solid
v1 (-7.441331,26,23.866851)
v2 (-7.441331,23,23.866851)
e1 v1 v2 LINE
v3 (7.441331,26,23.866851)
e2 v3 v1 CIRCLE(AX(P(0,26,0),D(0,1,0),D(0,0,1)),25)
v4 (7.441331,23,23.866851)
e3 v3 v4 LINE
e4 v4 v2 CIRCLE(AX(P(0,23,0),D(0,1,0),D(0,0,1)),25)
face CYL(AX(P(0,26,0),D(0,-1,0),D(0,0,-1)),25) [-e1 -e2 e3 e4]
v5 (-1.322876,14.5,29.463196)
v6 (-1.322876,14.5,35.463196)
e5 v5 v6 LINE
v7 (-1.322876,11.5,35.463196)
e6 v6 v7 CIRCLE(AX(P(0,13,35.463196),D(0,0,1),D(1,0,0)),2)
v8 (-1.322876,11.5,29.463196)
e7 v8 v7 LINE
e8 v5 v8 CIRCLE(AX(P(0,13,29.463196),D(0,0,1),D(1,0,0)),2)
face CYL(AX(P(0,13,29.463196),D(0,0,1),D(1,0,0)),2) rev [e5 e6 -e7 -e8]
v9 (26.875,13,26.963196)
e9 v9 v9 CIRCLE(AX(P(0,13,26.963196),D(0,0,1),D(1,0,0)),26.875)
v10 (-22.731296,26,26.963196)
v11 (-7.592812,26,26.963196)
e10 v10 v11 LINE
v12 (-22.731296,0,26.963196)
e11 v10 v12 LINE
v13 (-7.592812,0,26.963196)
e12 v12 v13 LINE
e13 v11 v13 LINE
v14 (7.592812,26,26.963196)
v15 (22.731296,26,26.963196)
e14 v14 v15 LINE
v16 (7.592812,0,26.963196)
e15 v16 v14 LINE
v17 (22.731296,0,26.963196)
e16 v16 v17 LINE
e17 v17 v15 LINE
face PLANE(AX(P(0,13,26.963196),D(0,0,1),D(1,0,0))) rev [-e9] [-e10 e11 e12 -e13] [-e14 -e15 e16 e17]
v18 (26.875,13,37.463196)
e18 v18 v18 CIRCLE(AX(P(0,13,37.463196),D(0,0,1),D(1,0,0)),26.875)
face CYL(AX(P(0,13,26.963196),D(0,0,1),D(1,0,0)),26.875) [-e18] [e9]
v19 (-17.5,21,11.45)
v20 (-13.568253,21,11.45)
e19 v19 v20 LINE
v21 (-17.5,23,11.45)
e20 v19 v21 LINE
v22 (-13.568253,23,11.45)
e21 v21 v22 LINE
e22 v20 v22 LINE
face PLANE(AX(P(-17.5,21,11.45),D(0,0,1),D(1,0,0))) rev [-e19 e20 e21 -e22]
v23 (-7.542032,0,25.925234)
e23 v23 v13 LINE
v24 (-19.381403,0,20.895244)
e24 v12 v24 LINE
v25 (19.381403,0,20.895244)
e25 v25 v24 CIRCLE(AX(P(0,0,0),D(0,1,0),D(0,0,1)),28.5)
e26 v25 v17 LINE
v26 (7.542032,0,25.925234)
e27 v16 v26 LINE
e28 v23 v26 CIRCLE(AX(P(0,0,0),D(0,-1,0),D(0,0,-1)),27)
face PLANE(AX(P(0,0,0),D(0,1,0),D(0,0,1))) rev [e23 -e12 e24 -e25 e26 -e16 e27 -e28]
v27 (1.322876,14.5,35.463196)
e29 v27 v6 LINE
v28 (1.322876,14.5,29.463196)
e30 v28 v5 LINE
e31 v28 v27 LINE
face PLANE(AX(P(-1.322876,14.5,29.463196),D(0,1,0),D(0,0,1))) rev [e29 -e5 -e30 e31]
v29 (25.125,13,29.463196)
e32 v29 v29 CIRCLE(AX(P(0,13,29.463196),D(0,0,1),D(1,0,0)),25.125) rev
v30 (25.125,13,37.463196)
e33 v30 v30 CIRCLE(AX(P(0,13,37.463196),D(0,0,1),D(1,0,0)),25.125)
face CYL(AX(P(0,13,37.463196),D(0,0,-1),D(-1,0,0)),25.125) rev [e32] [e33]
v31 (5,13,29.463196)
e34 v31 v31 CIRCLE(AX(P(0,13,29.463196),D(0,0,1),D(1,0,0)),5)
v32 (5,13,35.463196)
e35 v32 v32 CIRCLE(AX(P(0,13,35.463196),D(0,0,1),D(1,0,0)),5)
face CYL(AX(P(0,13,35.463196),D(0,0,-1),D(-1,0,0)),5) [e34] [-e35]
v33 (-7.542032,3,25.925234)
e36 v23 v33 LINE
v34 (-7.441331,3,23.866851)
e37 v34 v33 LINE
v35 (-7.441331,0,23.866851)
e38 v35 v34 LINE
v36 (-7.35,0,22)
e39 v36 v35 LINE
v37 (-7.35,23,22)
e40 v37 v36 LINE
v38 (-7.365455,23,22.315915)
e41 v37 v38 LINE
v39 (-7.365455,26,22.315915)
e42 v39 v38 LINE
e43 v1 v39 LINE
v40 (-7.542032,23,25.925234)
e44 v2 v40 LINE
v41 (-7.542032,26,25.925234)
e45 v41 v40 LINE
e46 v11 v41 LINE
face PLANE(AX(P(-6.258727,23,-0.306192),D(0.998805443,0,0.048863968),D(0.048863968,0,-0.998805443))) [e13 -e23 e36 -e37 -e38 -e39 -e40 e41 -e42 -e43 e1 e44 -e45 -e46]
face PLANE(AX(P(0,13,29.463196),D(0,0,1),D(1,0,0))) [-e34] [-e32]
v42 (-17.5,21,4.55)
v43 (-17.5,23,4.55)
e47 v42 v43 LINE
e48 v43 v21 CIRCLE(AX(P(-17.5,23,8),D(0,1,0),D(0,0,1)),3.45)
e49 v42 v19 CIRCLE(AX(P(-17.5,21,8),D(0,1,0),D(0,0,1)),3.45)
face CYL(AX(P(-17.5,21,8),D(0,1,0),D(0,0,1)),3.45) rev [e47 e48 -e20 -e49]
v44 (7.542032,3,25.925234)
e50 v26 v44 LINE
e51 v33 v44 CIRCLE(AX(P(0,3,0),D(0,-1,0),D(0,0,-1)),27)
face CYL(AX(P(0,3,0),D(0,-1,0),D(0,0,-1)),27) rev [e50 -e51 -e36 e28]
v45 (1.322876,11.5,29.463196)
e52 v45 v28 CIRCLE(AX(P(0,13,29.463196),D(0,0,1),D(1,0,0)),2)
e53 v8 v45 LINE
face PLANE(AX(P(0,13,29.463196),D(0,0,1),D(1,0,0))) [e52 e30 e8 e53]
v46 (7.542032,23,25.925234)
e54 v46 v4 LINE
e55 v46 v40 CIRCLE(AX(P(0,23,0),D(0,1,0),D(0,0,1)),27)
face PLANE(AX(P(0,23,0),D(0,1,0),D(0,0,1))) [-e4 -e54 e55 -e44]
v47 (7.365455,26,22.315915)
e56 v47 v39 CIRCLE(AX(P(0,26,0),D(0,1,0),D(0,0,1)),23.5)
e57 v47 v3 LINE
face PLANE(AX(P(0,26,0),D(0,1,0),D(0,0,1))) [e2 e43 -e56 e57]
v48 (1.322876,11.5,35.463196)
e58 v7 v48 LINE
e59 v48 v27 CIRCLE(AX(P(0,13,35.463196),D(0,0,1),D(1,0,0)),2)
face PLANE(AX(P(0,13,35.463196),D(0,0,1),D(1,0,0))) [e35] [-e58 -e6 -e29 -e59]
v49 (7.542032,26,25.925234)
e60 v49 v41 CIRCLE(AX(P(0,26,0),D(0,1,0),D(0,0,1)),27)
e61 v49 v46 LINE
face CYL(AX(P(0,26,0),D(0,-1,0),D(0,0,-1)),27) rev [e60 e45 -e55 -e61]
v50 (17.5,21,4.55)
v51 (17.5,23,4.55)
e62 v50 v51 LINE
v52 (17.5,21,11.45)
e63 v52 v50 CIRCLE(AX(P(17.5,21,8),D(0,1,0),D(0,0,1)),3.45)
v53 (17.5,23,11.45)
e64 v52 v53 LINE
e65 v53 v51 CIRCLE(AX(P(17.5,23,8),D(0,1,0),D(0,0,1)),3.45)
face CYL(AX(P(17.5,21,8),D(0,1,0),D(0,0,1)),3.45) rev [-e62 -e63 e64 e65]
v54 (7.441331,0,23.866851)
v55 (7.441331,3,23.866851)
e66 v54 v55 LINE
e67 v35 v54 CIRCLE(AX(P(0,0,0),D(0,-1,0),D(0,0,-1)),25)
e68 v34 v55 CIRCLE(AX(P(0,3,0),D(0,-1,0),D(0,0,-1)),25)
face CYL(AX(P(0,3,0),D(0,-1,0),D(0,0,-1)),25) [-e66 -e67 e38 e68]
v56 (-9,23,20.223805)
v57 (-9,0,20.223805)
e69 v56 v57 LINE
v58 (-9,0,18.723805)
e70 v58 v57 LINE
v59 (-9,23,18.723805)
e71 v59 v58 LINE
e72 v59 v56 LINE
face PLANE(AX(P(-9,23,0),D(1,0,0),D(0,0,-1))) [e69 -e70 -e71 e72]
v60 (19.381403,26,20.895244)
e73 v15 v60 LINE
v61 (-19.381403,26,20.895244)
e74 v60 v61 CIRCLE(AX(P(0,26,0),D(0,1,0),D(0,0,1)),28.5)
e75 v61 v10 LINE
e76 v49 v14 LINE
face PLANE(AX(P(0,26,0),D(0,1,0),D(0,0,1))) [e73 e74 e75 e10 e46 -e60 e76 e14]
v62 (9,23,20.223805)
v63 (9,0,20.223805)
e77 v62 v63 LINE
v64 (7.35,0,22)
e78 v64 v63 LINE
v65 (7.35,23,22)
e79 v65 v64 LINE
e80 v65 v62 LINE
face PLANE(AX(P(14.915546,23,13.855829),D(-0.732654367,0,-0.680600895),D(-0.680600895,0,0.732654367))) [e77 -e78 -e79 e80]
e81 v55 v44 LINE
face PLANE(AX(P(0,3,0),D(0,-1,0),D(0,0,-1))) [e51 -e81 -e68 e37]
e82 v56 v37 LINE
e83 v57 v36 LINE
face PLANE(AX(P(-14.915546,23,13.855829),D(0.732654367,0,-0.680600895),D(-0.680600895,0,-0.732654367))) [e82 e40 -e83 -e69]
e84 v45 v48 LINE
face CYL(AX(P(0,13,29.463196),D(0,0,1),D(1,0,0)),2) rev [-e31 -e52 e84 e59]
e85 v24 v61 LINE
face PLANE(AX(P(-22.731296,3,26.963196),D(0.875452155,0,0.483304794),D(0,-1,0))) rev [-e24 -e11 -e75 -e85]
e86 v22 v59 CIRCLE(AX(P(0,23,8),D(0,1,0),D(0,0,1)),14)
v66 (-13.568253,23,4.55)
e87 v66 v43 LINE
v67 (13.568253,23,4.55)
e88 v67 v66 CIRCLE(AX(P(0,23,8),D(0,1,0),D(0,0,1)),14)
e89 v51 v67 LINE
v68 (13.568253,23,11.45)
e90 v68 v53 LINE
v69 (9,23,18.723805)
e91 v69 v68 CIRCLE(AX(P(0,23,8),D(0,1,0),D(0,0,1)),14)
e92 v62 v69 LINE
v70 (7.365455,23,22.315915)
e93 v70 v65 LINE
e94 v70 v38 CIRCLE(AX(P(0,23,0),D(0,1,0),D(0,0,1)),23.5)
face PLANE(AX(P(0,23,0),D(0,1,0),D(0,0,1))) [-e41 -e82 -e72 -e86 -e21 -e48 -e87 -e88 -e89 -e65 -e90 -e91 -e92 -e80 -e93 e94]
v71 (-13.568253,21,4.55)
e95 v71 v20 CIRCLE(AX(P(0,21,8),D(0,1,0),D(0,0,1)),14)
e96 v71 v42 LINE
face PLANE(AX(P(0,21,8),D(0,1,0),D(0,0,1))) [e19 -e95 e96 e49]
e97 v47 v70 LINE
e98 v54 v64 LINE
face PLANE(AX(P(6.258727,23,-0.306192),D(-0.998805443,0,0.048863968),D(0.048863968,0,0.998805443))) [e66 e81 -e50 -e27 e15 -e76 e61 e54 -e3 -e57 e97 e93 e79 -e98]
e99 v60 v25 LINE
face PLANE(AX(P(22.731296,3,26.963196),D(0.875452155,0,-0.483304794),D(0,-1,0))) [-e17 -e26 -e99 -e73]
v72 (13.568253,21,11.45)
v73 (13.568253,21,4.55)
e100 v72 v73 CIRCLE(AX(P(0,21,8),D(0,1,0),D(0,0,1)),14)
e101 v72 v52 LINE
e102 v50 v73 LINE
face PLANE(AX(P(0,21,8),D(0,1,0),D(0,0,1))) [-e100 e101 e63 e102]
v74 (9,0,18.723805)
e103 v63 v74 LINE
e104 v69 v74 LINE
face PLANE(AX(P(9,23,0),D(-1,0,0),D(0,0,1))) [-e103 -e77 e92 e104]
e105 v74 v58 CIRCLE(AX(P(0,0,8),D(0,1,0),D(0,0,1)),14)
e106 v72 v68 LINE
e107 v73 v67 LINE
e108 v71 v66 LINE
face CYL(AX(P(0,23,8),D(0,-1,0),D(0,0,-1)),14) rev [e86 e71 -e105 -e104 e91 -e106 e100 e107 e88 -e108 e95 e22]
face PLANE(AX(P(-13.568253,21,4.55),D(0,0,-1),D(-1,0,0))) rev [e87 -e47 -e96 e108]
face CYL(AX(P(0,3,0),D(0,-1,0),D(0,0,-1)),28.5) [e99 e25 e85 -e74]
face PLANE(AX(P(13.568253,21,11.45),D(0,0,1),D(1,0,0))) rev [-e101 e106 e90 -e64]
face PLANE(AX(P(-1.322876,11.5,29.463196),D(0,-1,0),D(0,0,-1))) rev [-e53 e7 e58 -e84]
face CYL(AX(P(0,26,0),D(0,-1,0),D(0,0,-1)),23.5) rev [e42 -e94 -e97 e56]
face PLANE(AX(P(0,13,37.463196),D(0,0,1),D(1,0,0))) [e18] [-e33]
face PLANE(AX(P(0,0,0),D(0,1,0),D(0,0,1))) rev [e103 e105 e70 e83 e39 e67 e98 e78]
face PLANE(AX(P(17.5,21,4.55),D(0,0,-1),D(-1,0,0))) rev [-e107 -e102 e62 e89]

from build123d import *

# Parameters (mm, degrees)
SKETCH1_R                = 28.5
BOSS_EXTRUDE1_DEPTH      = 3
BOSS_EXTRUDE4_DEPTH      = 20
BOSS_EXTRUDE7_DEPTH      = 3
SKETCH7_R                = 27
SKETCH7_R_2              = 25
CUT_EXTRUDE1_DEPTH       = 3
CUT_EXTRUDE2_START       = -5
CUT_EXTRUDE2_DEPTH       = 5
CUT_EXTRUDE3_START       = -5
CUT_EXTRUDE3_DEPTH       = 5
BOSS_EXTRUDE8_DEPTH      = 2
BOSS_EXTRUDE8_DEPTH_BACK = 0.5
SKETCH10_R               = 26.875
CHAMFER1_SIZE            = 13.49895933
BOSS_EXTRUDE9_START      = 8
SKETCH11_R               = 26.875
SKETCH11_R_2             = 25.125
BOSS_EXTRUDE9_DEPTH      = 8
CUT_EXTRUDE4_START       = -2
CUT_EXTRUDE4_DEPTH       = 2
SKETCH12_R               = 5
BOSS_EXTRUDE10_DEPTH     = 6
CUT_EXTRUDE5_DEPTH       = 6


with BuildPart() as part:
    # Sketch1 → Boss-Extrude1 (new body)
    with BuildSketch(Plane(origin=(0, 0, 0), x_dir=(1, 0, 0), z_dir=(0, 1, 0))):
        with Locations(Location((0, 0, 0), (0, 0, 270))):
            Circle(SKETCH1_R)
    extrude(amount=BOSS_EXTRUDE1_DEPTH)

    # Sketch2 → Boss-Extrude4 (add)
    with BuildSketch(Plane(origin=(0, 3, 0), x_dir=(1, 0, 0), z_dir=(0, 1, 0))):
        with BuildLine():
            Line((-9, -20.223805295), (-9, -18.723805295))
            ThreePointArc((-9, -18.723805295), (-11.855740218, -15.445899804), (-13.568253388, -11.45))
            ThreePointArc((-13.568253388, -11.45), (-14, -8), (-13.568253388, -4.55))
            ThreePointArc((-13.568253388, -4.55), (0, 6), (13.568253388, -4.55))
            ThreePointArc((13.568253388, -4.55), (14, -8), (13.568253388, -11.45))
            ThreePointArc((13.568253388, -11.45), (11.855740218, -15.445899804), (9, -18.723805295))
            Line((9, -18.723805295), (9, -20.223805295))
            Line((9, -20.223805295), (7.35, -22))
            Line((7.35, -22), (7.617272727, -27.463196394))
            ThreePointArc((7.617272727, -27.463196394), (22.686364547, -17.250474302), (28.5, 0))
            ThreePointArc((28.5, 0), (-17.250474302, 22.686364547), (-7.617272727, -27.463196394))
            Line((-7.617272727, -27.463196394), (-7.35, -22))
            Line((-7.35, -22), (-9, -20.223805295))
        make_face()
    extrude(amount=BOSS_EXTRUDE4_DEPTH)

    # Boss-Extrude7: read off the stored shape, not the designer's step
    # Boss-Extrude7 outline → Boss-Extrude7 (add)
    with BuildSketch(Plane(origin=(0, 23, 0), x_dir=(1, 0, 0), z_dir=(0, 1, 0))):
        with BuildLine():
            ThreePointArc((7.617272727, -27.463196394), (0, 28.5), (-7.617272727, -27.463196394))
            Line((-7.617272727, -27.463196394), (-7.542031899, -25.92523394))
            ThreePointArc((-7.542031899, -25.92523394), (0, 27), (7.542031899, -25.92523394))
            Line((7.542031899, -25.92523394), (7.617272727, -27.463196394))
        make_face()
        with BuildLine():
            ThreePointArc((7.441330866, -23.866851383), (0, 25), (-7.441330866, -23.866851383))
            Line((-7.441330866, -23.866851383), (-7.365455329, -22.315915124))
            ThreePointArc((-7.365455329, -22.315915124), (0, 23.5), (7.365455329, -22.315915124))
            Line((7.365455329, -22.315915124), (7.441330866, -23.866851383))
        make_face()
    extrude(amount=BOSS_EXTRUDE7_DEPTH)

    # Sketch7 → Cut-Extrude1 (cut)
    with BuildSketch(Plane.XZ):
        with Locations(Location((0, 0, 0), (0, 0, 270))):
            Circle(SKETCH7_R)
        with Locations(Location((0, 0, 0), (0, 0, 270))):
            Circle(SKETCH7_R_2, mode=Mode.SUBTRACT)
    extrude(amount=-CUT_EXTRUDE1_DEPTH, mode=Mode.SUBTRACT)

    # Sketch8 → Cut-Extrude2 (cut)
    with BuildSketch(Plane(origin=(0, 3, 0), x_dir=(1, 0, 0), z_dir=(0, 1, 0)).offset(CUT_EXTRUDE2_START)):
        with BuildLine():
            Line((-7.542031899, -25.92523394), (-7.617272727, -27.463196394))
            ThreePointArc((-7.617272727, -27.463196394), (0, -28.5), (7.617272727, -27.463196394))
            Line((7.617272727, -27.463196394), (7.542031899, -25.92523394))
            ThreePointArc((7.542031899, -25.92523394), (0, -27), (-7.542031899, -25.92523394))
        make_face()
    extrude(amount=CUT_EXTRUDE2_DEPTH, mode=Mode.SUBTRACT)

    # Sketch9 → Cut-Extrude3 (cut)
    with BuildSketch(Plane(origin=(0, 3, 0), x_dir=(1, 0, 0), z_dir=(0, 1, 0)).offset(CUT_EXTRUDE3_START)):
        with BuildLine():
            Line((-7.35, -22), (-7.441330866, -23.866851383))
            ThreePointArc((-7.441330866, -23.866851383), (0, -25), (7.441330866, -23.866851383))
            Line((7.441330866, -23.866851383), (7.35, -22))
            Line((7.35, -22), (9, -20.223805295))
            Line((9, -20.223805295), (9, -18.723805295))
            ThreePointArc((9, -18.723805295), (0, 6), (-9, -18.723805295))
            Line((-9, -18.723805295), (-9, -20.223805295))
            Line((-9, -20.223805295), (-7.35, -22))
        make_face()
    extrude(amount=CUT_EXTRUDE3_DEPTH, mode=Mode.SUBTRACT)

    # Sketch10 → Boss-Extrude8 (add, two sides: drawn at the far end of the back side and taken through both)
    with BuildSketch(Plane.XY.offset(27.463196394).offset(-BOSS_EXTRUDE8_DEPTH_BACK)):
        with Locations((0, 13)):
            Circle(SKETCH10_R)
    extrude(amount=BOSS_EXTRUDE8_DEPTH + BOSS_EXTRUDE8_DEPTH_BACK)

    # Chamfer1
    # the kernel refuses this chamfer: 13.49895933, 12 mm, written as the material it adds along each edge
    with BuildSketch(Plane(origin=(9.23233666, 23, 26.963196394), x_dir=(0.8582935658681564, 0, -0.5131589956235051), z_dir=(0, -1, 0))) as chamfer1_piece_1:
        with BuildLine():
            Line((11.824703255, 0), (CHAMFER1_SIZE * 0.85829356586, CHAMFER1_SIZE * 0.513158995619))
            Line((CHAMFER1_SIZE * 0.85829356586, CHAMFER1_SIZE * 0.513158995619), (0, 0))
            ThreePointArc((0, 0), (5.921946236, 0.620003797), (11.824703255, 0))
        make_face()
    extrude(amount=23)
    with BuildSketch(Plane(origin=(-9.23233666, 23, 26.963196394), x_dir=(-0.8582935658681565, 0, -0.5131589956235051), z_dir=(0, -1, 0))) as chamfer1_piece_2:
        with BuildLine():
            Line((11.824703255, 0), (CHAMFER1_SIZE * 0.85829356586, -CHAMFER1_SIZE * 0.513158995619))
            Line((CHAMFER1_SIZE * 0.85829356586, -CHAMFER1_SIZE * 0.513158995619), (0, 0))
            ThreePointArc((0, 0), (5.921946236, -0.620003797), (11.824703255, 0))
        make_face()
    extrude(amount=23)
    with BuildSketch(Plane(origin=(-9.232336658, 26, 26.963196394), x_dir=(-0.8582935658951355, 0, -0.5131589955783807), z_dir=(0, -1, 0))) as chamfer1_piece_3:
        with BuildLine():
            Line((11.824703255, 0), (CHAMFER1_SIZE * 0.858293565887, -CHAMFER1_SIZE * 0.513158995574))
            Line((CHAMFER1_SIZE * 0.858293565887, -CHAMFER1_SIZE * 0.513158995574), (0, 0))
            ThreePointArc((0, 0), (5.921946236, -0.620003797), (11.824703255, 0))
        make_face()
    extrude(amount=3)
    with BuildSketch(Plane(origin=(9.232336658, 26, 26.963196394), x_dir=(0.8582935658951357, 0, -0.5131589955783805), z_dir=(0, -1, 0))) as chamfer1_piece_4:
        with BuildLine():
            Line((11.824703255, 0), (CHAMFER1_SIZE * 0.858293565887, CHAMFER1_SIZE * 0.513158995574))
            Line((CHAMFER1_SIZE * 0.858293565887, CHAMFER1_SIZE * 0.513158995574), (0, 0))
            ThreePointArc((0, 0), (5.921946236, 0.620003797), (11.824703255, 0))
        make_face()
    extrude(amount=3)

    # Sketch11 → Boss-Extrude9 (add)
    with BuildSketch(Plane.XY.offset(29.463196394).offset(BOSS_EXTRUDE9_START)):
        with Locations((0, 13)):
            Circle(SKETCH11_R)
        with Locations((0, 13)):
            Circle(SKETCH11_R_2, mode=Mode.SUBTRACT)
    extrude(amount=-BOSS_EXTRUDE9_DEPTH)

    # Sketch13 → Cut-Extrude4 (cut)
    with BuildSketch(Plane(origin=(0, 23, 0), x_dir=(1, 0, 0), z_dir=(0, 1, 0)).offset(CUT_EXTRUDE4_START)):
        with BuildLine():
            Line((13.568253388, -11.45), (17.5, -11.45))
            ThreePointArc((17.5, -11.45), (20.95, -8), (17.5, -4.55))
            Line((17.5, -4.55), (13.568253388, -4.55))
            ThreePointArc((13.568253388, -4.55), (0, 6), (-13.568253388, -4.55))
            Line((-13.568253388, -4.55), (-17.5, -4.55))
            ThreePointArc((-17.5, -4.55), (-20.95, -8), (-17.5, -11.45))
            Line((-17.5, -11.45), (-13.568253388, -11.45))
            ThreePointArc((-13.568253388, -11.45), (-11.855740218, -15.445899804), (-9, -18.723805295))
            Line((-9, -18.723805295), (-9, -20.223805295))
            Line((-9, -20.223805295), (-7.35, -22))
            Line((-7.35, -22), (-7.35, -25))
            Line((-7.35, -25), (7.35, -25))
            Line((7.35, -25), (7.35, -22))
            Line((7.35, -22), (9, -20.223805295))
            Line((9, -20.223805295), (9, -18.723805295))
            ThreePointArc((9, -18.723805295), (11.855740218, -15.445899804), (13.568253388, -11.45))
        make_face()
    extrude(amount=CUT_EXTRUDE4_DEPTH, mode=Mode.SUBTRACT)

    # Sketch12 → Boss-Extrude10 (add)
    with BuildSketch(Plane.XY.offset(29.463196394)):
        with Locations((0, 13)):
            Circle(SKETCH12_R)
    extrude(amount=BOSS_EXTRUDE10_DEPTH)

    # Sketch14 → Cut-Extrude5 (cut)
    with BuildSketch(Plane.XY.offset(35.463196394)):
        with BuildLine():
            Line((-1.322875656, 11.5), (1.322875656, 11.5))
            ThreePointArc((1.322875656, 11.5), (2, 13), (1.322875656, 14.5))
            Line((1.322875656, 14.5), (-1.322875656, 14.5))
            ThreePointArc((-1.322875656, 14.5), (-2, 13), (-1.322875656, 11.5))
        make_face()
    extrude(amount=-CUT_EXTRUDE5_DEPTH, mode=Mode.SUBTRACT)


solid = part.part
